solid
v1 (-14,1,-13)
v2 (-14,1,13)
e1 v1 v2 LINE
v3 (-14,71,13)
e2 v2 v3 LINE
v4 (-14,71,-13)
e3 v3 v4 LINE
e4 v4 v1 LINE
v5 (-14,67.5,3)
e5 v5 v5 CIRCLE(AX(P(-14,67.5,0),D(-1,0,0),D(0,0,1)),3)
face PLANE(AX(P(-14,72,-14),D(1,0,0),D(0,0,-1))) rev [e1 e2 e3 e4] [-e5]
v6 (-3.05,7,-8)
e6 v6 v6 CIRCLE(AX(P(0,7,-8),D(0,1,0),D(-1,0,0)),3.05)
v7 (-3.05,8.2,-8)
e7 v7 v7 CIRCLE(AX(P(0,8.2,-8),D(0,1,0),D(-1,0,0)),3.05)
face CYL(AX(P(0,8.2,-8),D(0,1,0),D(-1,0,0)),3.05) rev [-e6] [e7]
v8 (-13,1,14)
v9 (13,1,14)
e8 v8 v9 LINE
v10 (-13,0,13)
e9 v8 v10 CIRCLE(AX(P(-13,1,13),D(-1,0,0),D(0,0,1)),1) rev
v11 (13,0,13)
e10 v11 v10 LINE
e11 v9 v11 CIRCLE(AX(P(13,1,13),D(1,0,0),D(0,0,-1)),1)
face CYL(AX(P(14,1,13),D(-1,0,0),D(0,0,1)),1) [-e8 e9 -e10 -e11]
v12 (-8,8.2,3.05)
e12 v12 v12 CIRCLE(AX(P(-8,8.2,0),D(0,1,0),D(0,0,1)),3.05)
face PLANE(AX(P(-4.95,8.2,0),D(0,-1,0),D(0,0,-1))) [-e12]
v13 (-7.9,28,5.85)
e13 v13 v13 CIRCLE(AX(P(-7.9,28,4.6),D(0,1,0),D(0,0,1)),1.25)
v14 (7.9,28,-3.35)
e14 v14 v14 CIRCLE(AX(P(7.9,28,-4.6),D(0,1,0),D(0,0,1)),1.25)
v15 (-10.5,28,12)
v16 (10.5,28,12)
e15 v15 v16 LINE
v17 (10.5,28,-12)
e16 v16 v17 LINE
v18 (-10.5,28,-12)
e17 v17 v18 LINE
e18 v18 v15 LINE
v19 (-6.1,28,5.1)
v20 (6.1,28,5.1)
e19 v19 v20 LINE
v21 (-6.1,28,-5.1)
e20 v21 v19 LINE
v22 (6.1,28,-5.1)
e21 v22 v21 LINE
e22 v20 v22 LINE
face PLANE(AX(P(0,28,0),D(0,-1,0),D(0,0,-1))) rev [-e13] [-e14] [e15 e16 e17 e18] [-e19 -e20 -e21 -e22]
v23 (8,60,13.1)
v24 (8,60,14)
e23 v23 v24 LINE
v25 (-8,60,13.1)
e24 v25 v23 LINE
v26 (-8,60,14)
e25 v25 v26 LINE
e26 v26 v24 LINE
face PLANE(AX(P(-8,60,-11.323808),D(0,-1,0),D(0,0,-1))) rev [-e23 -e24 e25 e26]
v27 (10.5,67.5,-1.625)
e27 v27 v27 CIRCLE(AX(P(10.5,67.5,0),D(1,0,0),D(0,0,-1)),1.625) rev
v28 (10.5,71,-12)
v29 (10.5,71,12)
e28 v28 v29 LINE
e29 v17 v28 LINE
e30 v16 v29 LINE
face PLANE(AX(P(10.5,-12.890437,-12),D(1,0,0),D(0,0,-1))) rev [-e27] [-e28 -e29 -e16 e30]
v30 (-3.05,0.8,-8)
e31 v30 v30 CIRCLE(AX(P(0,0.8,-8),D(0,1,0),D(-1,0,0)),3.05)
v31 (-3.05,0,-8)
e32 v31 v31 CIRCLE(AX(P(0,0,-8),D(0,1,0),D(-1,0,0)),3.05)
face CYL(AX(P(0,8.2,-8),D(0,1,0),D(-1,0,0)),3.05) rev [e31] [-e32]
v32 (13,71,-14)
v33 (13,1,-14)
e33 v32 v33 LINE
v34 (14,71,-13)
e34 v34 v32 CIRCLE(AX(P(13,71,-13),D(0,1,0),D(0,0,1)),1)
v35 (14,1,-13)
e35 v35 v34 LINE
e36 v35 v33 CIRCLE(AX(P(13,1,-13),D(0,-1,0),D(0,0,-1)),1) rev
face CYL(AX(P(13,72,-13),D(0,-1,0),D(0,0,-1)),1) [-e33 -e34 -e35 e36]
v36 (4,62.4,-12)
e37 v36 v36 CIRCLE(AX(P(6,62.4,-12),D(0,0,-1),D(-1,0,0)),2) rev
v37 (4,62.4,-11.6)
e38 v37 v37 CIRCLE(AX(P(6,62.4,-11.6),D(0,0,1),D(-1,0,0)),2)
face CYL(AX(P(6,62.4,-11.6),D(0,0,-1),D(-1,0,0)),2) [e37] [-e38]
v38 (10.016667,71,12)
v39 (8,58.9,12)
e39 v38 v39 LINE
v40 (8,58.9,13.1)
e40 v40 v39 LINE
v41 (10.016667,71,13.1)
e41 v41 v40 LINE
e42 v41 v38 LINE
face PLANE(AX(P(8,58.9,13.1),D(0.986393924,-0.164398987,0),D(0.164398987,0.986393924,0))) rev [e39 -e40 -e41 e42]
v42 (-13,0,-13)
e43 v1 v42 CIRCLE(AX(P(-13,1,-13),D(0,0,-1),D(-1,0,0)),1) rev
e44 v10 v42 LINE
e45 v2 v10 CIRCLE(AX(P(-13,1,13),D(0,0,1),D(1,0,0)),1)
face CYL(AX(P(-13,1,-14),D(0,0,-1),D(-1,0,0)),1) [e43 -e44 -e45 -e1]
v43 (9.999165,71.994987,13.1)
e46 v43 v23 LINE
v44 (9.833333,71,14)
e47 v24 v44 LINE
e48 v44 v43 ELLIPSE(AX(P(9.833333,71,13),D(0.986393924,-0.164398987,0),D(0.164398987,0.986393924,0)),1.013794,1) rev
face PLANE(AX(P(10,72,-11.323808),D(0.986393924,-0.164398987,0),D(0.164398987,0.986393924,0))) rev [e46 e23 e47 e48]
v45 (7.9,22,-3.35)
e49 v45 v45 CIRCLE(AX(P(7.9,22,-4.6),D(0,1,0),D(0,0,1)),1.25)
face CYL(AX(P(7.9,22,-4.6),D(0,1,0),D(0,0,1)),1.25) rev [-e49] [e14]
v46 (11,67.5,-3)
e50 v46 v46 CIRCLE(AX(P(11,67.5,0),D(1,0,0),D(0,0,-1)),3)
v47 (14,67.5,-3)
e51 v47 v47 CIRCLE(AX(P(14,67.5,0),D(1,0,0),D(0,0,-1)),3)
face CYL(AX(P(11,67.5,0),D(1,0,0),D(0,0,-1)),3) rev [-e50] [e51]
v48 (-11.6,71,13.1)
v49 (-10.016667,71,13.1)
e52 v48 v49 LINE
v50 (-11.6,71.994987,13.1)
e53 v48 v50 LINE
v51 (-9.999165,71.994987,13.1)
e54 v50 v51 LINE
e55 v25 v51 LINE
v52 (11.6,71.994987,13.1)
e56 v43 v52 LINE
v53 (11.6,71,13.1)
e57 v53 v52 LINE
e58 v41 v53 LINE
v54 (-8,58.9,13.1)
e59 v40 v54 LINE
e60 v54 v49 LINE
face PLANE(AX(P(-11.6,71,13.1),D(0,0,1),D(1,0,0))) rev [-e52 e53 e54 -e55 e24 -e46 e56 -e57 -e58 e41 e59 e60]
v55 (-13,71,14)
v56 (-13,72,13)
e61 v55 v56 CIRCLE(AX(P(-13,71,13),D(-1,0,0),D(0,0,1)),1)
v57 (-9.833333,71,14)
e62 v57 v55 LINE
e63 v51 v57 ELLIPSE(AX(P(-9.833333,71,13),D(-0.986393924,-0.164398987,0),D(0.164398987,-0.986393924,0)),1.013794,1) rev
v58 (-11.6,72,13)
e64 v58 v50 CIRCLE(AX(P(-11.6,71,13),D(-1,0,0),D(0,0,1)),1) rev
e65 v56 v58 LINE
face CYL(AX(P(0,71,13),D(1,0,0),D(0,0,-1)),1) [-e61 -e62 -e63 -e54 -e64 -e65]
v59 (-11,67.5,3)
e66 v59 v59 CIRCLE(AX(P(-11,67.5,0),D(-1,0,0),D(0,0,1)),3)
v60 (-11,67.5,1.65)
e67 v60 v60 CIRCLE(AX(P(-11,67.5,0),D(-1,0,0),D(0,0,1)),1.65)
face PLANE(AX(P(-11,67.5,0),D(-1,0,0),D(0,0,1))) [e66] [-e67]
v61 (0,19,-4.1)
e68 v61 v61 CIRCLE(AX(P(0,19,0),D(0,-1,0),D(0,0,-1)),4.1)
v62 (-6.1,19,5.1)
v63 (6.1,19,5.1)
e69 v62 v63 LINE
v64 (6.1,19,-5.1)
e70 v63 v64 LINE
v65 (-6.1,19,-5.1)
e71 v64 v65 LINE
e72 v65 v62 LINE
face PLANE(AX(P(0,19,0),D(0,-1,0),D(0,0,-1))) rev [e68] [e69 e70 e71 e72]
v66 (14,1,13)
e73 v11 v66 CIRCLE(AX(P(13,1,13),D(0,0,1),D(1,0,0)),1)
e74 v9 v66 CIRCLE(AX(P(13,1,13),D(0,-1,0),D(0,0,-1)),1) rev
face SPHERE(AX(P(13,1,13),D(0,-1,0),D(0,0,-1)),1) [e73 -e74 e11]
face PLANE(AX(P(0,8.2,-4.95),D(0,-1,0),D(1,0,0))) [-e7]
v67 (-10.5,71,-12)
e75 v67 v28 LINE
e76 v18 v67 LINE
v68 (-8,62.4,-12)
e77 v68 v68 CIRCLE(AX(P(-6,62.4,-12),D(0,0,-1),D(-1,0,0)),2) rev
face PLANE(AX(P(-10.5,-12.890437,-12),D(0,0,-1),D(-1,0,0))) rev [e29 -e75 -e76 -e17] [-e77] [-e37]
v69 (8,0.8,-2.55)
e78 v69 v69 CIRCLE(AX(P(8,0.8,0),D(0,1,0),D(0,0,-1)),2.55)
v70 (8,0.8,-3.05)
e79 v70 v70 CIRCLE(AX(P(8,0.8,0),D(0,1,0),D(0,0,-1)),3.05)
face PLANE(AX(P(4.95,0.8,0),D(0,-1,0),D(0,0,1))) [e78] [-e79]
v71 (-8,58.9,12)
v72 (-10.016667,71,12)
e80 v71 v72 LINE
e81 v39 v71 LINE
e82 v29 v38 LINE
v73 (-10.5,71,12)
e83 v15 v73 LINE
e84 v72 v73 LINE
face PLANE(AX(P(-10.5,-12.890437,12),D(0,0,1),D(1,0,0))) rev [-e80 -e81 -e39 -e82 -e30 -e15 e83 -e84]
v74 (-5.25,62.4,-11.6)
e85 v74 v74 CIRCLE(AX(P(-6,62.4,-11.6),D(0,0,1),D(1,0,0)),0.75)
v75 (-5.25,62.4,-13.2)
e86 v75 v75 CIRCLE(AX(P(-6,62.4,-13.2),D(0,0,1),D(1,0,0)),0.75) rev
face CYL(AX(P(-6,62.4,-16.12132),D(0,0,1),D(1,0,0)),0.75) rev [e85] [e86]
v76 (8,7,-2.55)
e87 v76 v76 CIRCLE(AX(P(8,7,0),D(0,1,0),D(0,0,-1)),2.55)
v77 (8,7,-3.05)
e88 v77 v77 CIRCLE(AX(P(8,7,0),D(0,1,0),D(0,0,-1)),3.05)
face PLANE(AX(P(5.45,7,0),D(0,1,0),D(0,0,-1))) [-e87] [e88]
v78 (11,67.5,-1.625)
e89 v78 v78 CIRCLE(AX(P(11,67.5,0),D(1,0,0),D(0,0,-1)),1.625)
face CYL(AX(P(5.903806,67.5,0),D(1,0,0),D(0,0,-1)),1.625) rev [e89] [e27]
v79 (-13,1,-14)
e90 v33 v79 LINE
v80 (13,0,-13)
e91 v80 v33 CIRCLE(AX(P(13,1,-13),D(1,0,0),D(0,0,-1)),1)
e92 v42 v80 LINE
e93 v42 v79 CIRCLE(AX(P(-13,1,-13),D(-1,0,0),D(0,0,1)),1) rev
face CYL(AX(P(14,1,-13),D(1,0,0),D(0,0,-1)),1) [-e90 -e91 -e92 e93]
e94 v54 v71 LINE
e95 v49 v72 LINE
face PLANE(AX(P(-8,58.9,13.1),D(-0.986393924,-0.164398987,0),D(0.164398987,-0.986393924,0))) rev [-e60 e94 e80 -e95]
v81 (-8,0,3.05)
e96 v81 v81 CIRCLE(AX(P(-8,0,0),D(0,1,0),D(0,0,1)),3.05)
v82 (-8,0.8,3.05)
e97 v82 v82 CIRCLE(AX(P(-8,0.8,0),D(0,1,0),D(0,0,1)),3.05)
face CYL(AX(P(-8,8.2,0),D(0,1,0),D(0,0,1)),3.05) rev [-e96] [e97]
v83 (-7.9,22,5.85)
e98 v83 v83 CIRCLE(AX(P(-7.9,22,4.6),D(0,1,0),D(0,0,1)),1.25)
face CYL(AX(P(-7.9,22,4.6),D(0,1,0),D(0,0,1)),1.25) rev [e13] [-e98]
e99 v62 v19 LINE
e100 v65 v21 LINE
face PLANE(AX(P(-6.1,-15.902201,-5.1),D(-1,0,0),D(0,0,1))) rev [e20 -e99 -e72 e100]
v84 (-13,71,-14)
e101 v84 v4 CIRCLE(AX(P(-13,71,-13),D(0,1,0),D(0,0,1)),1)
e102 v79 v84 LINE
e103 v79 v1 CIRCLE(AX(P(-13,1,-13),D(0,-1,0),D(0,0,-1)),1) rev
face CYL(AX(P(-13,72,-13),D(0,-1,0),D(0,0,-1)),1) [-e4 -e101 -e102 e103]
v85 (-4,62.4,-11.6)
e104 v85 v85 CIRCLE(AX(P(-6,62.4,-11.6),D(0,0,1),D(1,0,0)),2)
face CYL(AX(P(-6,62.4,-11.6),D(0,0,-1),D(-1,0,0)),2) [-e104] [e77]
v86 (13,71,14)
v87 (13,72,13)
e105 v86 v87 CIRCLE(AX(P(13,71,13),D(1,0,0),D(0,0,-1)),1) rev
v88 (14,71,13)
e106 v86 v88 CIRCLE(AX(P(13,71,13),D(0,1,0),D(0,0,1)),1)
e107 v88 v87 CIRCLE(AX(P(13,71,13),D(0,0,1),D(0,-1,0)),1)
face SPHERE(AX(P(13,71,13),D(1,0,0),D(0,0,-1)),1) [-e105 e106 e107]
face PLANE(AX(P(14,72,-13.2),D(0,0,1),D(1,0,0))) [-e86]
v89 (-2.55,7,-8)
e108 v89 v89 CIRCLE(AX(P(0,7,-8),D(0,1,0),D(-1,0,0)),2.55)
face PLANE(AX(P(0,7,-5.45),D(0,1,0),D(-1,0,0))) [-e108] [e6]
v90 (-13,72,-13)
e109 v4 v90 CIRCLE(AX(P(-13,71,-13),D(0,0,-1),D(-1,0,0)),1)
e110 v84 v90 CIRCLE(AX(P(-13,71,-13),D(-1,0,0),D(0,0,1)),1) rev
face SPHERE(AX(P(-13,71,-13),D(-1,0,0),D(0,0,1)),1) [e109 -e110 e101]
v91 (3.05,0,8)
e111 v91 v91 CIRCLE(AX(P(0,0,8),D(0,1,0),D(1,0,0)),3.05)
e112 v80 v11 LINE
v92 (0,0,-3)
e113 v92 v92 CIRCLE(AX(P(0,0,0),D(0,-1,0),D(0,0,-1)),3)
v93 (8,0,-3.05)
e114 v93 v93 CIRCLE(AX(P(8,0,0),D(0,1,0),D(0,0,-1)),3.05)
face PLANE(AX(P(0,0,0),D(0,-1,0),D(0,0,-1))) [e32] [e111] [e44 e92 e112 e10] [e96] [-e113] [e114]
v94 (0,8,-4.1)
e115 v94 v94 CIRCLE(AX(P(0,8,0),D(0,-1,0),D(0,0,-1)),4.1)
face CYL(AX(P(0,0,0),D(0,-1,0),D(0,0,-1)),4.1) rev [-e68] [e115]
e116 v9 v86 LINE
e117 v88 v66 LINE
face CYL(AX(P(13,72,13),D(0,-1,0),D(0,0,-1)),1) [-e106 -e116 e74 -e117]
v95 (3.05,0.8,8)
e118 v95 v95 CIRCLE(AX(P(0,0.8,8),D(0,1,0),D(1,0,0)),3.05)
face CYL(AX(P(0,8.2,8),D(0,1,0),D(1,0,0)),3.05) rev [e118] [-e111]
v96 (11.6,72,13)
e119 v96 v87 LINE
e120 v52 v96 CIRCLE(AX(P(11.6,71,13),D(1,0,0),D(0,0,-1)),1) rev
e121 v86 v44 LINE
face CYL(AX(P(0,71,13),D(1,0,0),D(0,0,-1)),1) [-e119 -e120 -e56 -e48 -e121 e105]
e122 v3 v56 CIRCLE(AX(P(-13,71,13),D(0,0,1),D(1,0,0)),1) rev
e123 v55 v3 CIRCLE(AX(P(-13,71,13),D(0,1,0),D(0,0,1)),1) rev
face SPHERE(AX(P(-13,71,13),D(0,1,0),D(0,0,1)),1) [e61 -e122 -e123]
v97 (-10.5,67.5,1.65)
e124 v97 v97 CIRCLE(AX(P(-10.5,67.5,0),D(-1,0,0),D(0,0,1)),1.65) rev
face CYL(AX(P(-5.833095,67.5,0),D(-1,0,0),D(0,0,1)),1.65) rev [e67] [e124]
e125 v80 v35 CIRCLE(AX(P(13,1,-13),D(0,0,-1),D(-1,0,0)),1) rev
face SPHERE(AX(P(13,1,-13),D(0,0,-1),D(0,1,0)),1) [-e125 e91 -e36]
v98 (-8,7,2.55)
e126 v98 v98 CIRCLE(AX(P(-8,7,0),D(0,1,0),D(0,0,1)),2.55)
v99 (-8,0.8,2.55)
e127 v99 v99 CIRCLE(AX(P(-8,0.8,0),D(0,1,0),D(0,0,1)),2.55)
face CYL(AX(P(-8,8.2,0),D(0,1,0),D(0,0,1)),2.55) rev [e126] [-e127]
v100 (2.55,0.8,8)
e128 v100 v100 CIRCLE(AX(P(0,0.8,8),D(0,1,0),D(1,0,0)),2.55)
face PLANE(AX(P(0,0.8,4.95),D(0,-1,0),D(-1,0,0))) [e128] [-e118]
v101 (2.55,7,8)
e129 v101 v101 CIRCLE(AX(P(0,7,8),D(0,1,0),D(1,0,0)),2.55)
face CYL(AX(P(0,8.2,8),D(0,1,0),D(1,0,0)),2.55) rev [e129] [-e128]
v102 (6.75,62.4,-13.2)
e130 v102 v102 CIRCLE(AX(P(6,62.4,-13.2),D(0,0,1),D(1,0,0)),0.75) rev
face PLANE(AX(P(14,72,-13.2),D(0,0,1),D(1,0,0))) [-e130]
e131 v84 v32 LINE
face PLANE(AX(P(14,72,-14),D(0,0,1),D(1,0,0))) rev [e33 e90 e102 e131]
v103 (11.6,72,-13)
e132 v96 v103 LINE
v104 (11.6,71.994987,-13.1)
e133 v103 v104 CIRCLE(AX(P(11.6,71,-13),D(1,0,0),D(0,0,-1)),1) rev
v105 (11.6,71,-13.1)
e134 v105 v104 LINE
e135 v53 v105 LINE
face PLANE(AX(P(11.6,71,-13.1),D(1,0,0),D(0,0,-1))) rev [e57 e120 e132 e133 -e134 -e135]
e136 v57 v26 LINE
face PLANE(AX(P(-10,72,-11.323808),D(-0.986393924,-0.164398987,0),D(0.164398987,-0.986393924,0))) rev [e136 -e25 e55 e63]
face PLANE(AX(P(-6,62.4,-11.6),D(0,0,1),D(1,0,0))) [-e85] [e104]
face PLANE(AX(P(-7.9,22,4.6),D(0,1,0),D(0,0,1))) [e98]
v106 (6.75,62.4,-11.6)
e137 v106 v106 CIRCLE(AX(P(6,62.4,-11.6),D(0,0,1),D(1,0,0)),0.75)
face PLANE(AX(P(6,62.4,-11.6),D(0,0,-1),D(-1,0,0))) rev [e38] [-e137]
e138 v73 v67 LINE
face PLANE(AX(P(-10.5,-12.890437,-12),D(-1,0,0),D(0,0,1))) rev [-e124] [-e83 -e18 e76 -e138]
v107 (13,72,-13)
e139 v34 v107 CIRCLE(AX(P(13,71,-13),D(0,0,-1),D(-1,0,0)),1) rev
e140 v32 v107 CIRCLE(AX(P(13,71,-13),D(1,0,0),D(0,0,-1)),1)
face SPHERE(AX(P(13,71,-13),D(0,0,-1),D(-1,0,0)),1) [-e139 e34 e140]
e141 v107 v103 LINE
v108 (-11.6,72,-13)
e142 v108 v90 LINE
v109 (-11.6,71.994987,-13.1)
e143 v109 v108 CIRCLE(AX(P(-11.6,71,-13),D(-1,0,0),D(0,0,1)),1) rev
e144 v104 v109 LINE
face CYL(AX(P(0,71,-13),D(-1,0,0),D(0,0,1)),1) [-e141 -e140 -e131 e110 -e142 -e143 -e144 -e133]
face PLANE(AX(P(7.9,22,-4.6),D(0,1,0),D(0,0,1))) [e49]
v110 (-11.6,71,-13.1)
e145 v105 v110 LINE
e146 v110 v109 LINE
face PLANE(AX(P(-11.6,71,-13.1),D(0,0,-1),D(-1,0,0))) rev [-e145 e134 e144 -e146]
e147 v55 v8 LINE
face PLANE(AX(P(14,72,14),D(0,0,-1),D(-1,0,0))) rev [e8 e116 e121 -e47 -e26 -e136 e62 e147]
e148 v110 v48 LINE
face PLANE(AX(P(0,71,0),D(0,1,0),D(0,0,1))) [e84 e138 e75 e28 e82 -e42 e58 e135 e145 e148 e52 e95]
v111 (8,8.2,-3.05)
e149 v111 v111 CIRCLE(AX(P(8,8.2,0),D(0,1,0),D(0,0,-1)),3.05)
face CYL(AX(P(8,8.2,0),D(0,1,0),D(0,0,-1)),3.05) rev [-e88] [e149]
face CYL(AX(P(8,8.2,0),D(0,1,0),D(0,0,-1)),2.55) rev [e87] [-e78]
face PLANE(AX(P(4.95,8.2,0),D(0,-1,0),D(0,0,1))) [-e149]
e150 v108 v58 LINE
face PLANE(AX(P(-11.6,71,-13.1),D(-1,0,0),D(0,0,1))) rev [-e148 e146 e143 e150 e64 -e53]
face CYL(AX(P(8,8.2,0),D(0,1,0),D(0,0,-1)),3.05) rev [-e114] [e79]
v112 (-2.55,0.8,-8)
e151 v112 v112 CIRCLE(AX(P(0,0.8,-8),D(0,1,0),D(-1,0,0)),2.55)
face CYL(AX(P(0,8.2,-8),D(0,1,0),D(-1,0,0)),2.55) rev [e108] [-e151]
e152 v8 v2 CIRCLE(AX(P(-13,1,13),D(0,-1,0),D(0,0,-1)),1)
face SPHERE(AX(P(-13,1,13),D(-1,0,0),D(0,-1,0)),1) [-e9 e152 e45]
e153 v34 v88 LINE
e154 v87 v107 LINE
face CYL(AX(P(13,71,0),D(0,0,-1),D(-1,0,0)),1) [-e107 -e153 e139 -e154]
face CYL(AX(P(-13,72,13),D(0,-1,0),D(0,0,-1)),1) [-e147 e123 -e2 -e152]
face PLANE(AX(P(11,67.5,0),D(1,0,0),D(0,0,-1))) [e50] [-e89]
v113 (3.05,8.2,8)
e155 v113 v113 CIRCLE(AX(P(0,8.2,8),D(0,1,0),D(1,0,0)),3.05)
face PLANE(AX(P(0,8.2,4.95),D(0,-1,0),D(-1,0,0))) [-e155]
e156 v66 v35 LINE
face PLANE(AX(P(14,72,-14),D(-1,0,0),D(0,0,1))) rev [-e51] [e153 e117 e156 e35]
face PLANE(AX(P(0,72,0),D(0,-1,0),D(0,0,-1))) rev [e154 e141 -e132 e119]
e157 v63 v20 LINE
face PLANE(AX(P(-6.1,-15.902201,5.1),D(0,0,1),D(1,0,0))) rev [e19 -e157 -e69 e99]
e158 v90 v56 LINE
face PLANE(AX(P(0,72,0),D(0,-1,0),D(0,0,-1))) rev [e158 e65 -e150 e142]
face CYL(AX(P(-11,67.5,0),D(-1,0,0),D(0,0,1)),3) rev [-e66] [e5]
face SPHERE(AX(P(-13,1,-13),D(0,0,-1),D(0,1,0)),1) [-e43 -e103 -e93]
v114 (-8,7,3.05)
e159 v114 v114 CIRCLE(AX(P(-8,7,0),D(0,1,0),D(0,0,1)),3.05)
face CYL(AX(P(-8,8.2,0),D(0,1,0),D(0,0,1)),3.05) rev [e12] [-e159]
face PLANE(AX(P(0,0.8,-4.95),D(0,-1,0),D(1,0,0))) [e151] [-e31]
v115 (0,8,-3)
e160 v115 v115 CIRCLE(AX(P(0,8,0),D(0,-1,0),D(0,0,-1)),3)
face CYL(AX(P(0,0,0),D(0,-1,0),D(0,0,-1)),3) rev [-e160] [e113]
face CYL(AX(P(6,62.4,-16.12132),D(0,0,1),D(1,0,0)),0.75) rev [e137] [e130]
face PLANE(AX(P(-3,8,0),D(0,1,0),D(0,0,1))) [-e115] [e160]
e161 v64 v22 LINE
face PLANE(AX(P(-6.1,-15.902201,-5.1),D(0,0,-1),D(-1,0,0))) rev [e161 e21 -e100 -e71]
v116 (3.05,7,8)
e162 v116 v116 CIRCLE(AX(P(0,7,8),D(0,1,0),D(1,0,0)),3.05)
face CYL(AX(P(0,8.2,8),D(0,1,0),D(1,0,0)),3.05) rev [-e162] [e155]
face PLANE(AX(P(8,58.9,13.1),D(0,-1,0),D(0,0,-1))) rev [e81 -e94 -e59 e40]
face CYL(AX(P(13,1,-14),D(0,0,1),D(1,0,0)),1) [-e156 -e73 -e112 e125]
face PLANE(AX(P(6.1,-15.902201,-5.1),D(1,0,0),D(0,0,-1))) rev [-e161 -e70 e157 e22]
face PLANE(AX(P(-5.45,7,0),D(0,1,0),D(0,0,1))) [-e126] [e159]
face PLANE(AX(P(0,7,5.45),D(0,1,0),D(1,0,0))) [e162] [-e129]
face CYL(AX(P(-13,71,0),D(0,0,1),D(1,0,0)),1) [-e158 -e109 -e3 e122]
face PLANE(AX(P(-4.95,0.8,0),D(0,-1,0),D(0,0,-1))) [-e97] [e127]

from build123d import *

# Parameters (mm, degrees)
SKIZZE1_W                        = 28
SKIZZE1_H                        = 28
AUFSATZ_LINEAR_AUSTRAGEN1_DEPTH  = 72
SKIZZE2_W                        = 12.2
SKIZZE2_H                        = 10.2
SCHNITT_LINEAR_AUSTRAGEN1_DEPTH  = 53
SKIZZE3_W                        = 21
SKIZZE3_H                        = 24
SCHNITT_LINEAR_AUSTRAGEN2_DEPTH  = 44
SKIZZE6_R                        = 1.25
SCHNITT_LINEAR_AUSTRAGEN4_DEPTH  = 6
SCHNITT_LINEAR_AUSTRAGEN13_DEPTH = 2
SKIZZE7_W                        = 23.2
SKIZZE7_H                        = 26.2
SCHNITT_LINEAR_AUSTRAGEN5_DEPTH  = 1
SCHNITT_LINEAR_AUSTRAGEN14_DEPTH = 1.1
SKIZZE13_R                       = 3
SCHNITT_LINEAR_AUSTRAGEN11_DEPTH = 3
SCHNITT_LINEAR_START             = -3
SKIZZE11_R                       = 3
SCHNITT_LINEAR_AUSTRAGEN9_DEPTH  = 3
SKIZZE12_R                       = 1.625
SCHNITT_LINEAR_AUSTRAGEN10_DEPTH = 0.5
SKIZZE14_R                       = 1.65
SCHNITT_LINEAR_AUSTRAGEN12_DEPTH = 0.5
SKIZZE18_R                       = 2
AUFSATZ_LINEAR_AUSTRAGEN2_DEPTH  = 0.4
SKIZZE19_R                       = 0.75
SCHNITT_LINEAR_AUSTRAGEN15_DEPTH = 1.6
KREISMUSTER1_COUNT               = 4
VERRUNDUNG1_R                    = 1


with BuildPart() as part:
    # Skizze1 → Aufsatz-Linear austragen1 (new body)
    with BuildSketch(Plane(origin=(0, 0, 0), x_dir=(1, 0, 0), z_dir=(0, 1, 0))):
        Rectangle(SKIZZE1_W, SKIZZE1_H)
    extrude(amount=AUFSATZ_LINEAR_AUSTRAGEN1_DEPTH)

    # Skizze2 → Schnitt-Linear austragen1 (cut)
    with BuildSketch(Plane(origin=(0, 72, 0), x_dir=(1, 0, 0), z_dir=(0, 1, 0))):
        Rectangle(SKIZZE2_W, SKIZZE2_H)
    extrude(amount=-SCHNITT_LINEAR_AUSTRAGEN1_DEPTH, mode=Mode.SUBTRACT)

    # Skizze3 → Schnitt-Linear austragen2 (cut)
    with BuildSketch(Plane(origin=(0, 72, 0), x_dir=(1, 0, 0), z_dir=(0, 1, 0))):
        Rectangle(SKIZZE3_W, SKIZZE3_H)
    extrude(amount=-SCHNITT_LINEAR_AUSTRAGEN2_DEPTH, mode=Mode.SUBTRACT)

    # Skizze5 → Schnitt-Rotation1 (revolve, cut)
    with BuildSketch(Plane.XY, mode=Mode.PRIVATE) as schnitt_rotation1_sk:
        Polygon((-3, 0), (-3, 8), (-4.1, 8), (-4.1, 19), (0, 19), (0, 0), align=None)
    revolve(schnitt_rotation1_sk.sketch.rotate(Axis((0, 0, 0), (0, 1, 0)), 270), axis=Axis((0, 0, 0), (0, 1, 0)), mode=Mode.SUBTRACT)

    # Skizze6 → Schnitt-Linear austragen4 (cut)
    with BuildSketch(Plane(origin=(0, 28, 0), x_dir=(1, 0, 0), z_dir=(0, 1, 0))):
        with Locations(Location((7.9, 4.6, 0), (0, 0, 270))):
            Circle(SKIZZE6_R)
        with Locations(Location((-7.9, -4.6, 0), (0, 0, 270))):
            Circle(SKIZZE6_R)
    extrude(amount=-SCHNITT_LINEAR_AUSTRAGEN4_DEPTH, mode=Mode.SUBTRACT)

    # Skizze15 → Schnitt-Linear austragen13 (cut)
    with BuildSketch(Plane.XY.offset(14)):
        Polygon((10, 72), (-10, 72), (-8, 60), (8, 60), align=None)
    extrude(amount=-SCHNITT_LINEAR_AUSTRAGEN13_DEPTH, mode=Mode.SUBTRACT)

    # Skizze7 → Schnitt-Linear austragen5 (cut)
    with BuildSketch(Plane(origin=(0, 72, 0), x_dir=(1, 0, 0), z_dir=(0, 1, 0))):
        Rectangle(SKIZZE7_W, SKIZZE7_H)
    extrude(amount=-SCHNITT_LINEAR_AUSTRAGEN5_DEPTH, mode=Mode.SUBTRACT)

    # Skizze17 → Schnitt-Linear austragen14 (cut)
    with BuildSketch(Plane(origin=(0, 0, 12), x_dir=(-1, 0, 0), z_dir=(0, 0, -1))):
        Polygon((-8, 58.9), (-10.016666667, 71), (-9.833333333, 71), (-8, 60), (8, 60), (9.833333333, 71), (10.016666667, 71), (8, 58.9), align=None)
    extrude(amount=-SCHNITT_LINEAR_AUSTRAGEN14_DEPTH, mode=Mode.SUBTRACT)

    # Skizze13 → Schnitt-Linear austragen11 (cut)
    with BuildSketch(Plane.ZY.offset(14)):
        with Locations((0, 67.5)):
            Circle(SKIZZE13_R)
    extrude(amount=-SCHNITT_LINEAR_AUSTRAGEN11_DEPTH, mode=Mode.SUBTRACT)

    # Skizze11 → Schnitt-Linear austragen9 (cut)
    with BuildSketch(Plane(origin=(14, 0, 0), x_dir=(0, 0, -1), z_dir=(1, 0, 0)).offset(SCHNITT_LINEAR_START)):
        with Locations(Location((0, 67.5, 0), (0, 0, 180))):
            Circle(SKIZZE11_R)
    extrude(amount=SCHNITT_LINEAR_AUSTRAGEN9_DEPTH, mode=Mode.SUBTRACT)

    # Skizze12 → Schnitt-Linear austragen10 (cut)
    with BuildSketch(Plane(origin=(11, 0, 0), x_dir=(0, 0, -1), z_dir=(1, 0, 0))):
        with Locations((0, 67.5)):
            Circle(SKIZZE12_R)
    extrude(amount=-SCHNITT_LINEAR_AUSTRAGEN10_DEPTH, mode=Mode.SUBTRACT)

    # Skizze14 → Schnitt-Linear austragen12 (cut)
    with BuildSketch(Plane.ZY.offset(11)):
        with Locations((0, 67.5)):
            Circle(SKIZZE14_R)
    extrude(amount=-SCHNITT_LINEAR_AUSTRAGEN12_DEPTH, mode=Mode.SUBTRACT)

    # Skizze18 → Aufsatz-Linear austragen2 (add)
    with BuildSketch(Plane.XY.offset(-12)):
        with Locations(Location((-6, 62.4, 0), (0, 0, 180))):
            Circle(SKIZZE18_R)
        with Locations(Location((6, 62.4, 0), (0, 0, 180))):
            Circle(SKIZZE18_R)
    extrude(amount=AUFSATZ_LINEAR_AUSTRAGEN2_DEPTH)

    # Skizze19 → Schnitt-Linear austragen15 (cut)
    with BuildSketch(Plane.XY.offset(-11.6)):
        with Locations((-6, 62.4)):
            Circle(SKIZZE19_R)
        with Locations((6, 62.4)):
            Circle(SKIZZE19_R)
    extrude(amount=-SCHNITT_LINEAR_AUSTRAGEN15_DEPTH, mode=Mode.SUBTRACT)

    # Skizze20 → Schnitt-Rotation2 (revolve, cut)
    with BuildSketch(Plane.XY, mode=Mode.PRIVATE) as schnitt_rotation2_sk:
        Polygon((-4.95, 0), (-4.95, 0.8), (-5.45, 0.8), (-5.45, 7), (-4.95, 7), (-4.95, 8.2), (-8, 8.2), (-8, 0), align=None)
    schnitt_rotation2 = revolve(schnitt_rotation2_sk.sketch.rotate(Axis((-8, 8.2, 0), (0, -1, 0)), 90), axis=Axis((-8, 8.2, 0), (0, -1, 0)), mode=Mode.SUBTRACT)

    # Kreismuster1: Schnitt-Rotation2 ×4 about axis
    kreismuster1_axis = Axis((0, 0, 0), (0, 1, 0))
    for i in range(1, KREISMUSTER1_COUNT):
        add(schnitt_rotation2.rotate(kreismuster1_axis, i * 360 / KREISMUSTER1_COUNT), mode=Mode.SUBTRACT)

    # Verrundung1
    # the kernel refuses this fillet: 1 mm, written as the material it takes off along each edge
    with BuildSketch(Plane(origin=(-13, 1, -13), x_dir=(-1, 0, 0), z_dir=(0, 0, -1))) as verrundung1_piece_1_section:
        Polygon((0, 0), (VERRUNDUNG1_R, 0), (VERRUNDUNG1_R, -VERRUNDUNG1_R), (0, -VERRUNDUNG1_R), align=None)
    verrundung1_piece_1 = extrude(amount=VERRUNDUNG1_R, mode=Mode.PRIVATE)
    verrundung1_piece_1 = verrundung1_piece_1 - Plane(origin=(-13, 1, -13), x_dir=(0.7071067811865475, 0.7071067811865475, 0), z_dir=(0, 0, -1)) * Sphere(VERRUNDUNG1_R, mode=Mode.PRIVATE)
    add(verrundung1_piece_1, mode=Mode.SUBTRACT)
    with BuildSketch(Plane(origin=(-13, 1, 13), x_dir=(0, -1, 0), z_dir=(-1, 0, 0))) as verrundung1_piece_2_section:
        Polygon((0, 0), (VERRUNDUNG1_R, 0), (VERRUNDUNG1_R, VERRUNDUNG1_R), (0, VERRUNDUNG1_R), align=None)
    verrundung1_piece_2 = extrude(amount=VERRUNDUNG1_R, mode=Mode.PRIVATE)
    verrundung1_piece_2 = verrundung1_piece_2 - Plane(origin=(-13, 1, 13), x_dir=(0, 0.7071067811865475, -0.7071067811865475), z_dir=(-1, 0, 0)) * Sphere(VERRUNDUNG1_R, mode=Mode.PRIVATE)
    add(verrundung1_piece_2, mode=Mode.SUBTRACT)
    with BuildSketch(Plane(origin=(13, 1, 13), x_dir=(0, -1, 0), z_dir=(1, 0, 0))) as verrundung1_piece_3_section:
        Polygon((0, 0), (VERRUNDUNG1_R, 0), (VERRUNDUNG1_R, -VERRUNDUNG1_R), (0, -VERRUNDUNG1_R), align=None)
    verrundung1_piece_3 = extrude(amount=VERRUNDUNG1_R, mode=Mode.PRIVATE)
    verrundung1_piece_3 = verrundung1_piece_3 - Plane(origin=(13, 1, 13), x_dir=(0, 0.7071067811865475, -0.7071067811865475), z_dir=(1, 0, 0)) * Sphere(VERRUNDUNG1_R, mode=Mode.PRIVATE)
    add(verrundung1_piece_3, mode=Mode.SUBTRACT)
    with BuildSketch(Plane(origin=(13, 1, -13), x_dir=(1, 0, 0), z_dir=(0, 0, -1))) as verrundung1_piece_4_section:
        Polygon((0, 0), (VERRUNDUNG1_R, 0), (VERRUNDUNG1_R, VERRUNDUNG1_R), (0, VERRUNDUNG1_R), align=None)
    verrundung1_piece_4 = extrude(amount=VERRUNDUNG1_R, mode=Mode.PRIVATE)
    verrundung1_piece_4 = verrundung1_piece_4 - Plane(origin=(13, 1, -13), x_dir=(-0.7071067811865475, 0.7071067811865475, 0), z_dir=(0, 0, -1)) * Sphere(VERRUNDUNG1_R, mode=Mode.PRIVATE)
    add(verrundung1_piece_4, mode=Mode.SUBTRACT)
    with BuildSketch(Plane(origin=(13, 71, 13), x_dir=(0, 1, 0), z_dir=(1, 0, 0))) as verrundung1_piece_5_section:
        Polygon((0, 0), (VERRUNDUNG1_R, 0), (VERRUNDUNG1_R, VERRUNDUNG1_R), (0, VERRUNDUNG1_R), align=None)
    verrundung1_piece_5 = extrude(amount=VERRUNDUNG1_R, mode=Mode.PRIVATE)
    verrundung1_piece_5 = verrundung1_piece_5 - Plane(origin=(13, 71, 13), x_dir=(0, -0.7071067811865475, -0.7071067811865475), z_dir=(1, 0, 0)) * Sphere(VERRUNDUNG1_R, mode=Mode.PRIVATE)
    add(verrundung1_piece_5, mode=Mode.SUBTRACT)
    with BuildSketch(Plane(origin=(13, 71, -13), x_dir=(1, 0, 0), z_dir=(0, 0, -1))) as verrundung1_piece_6_section:
        Polygon((0, 0), (VERRUNDUNG1_R, 0), (VERRUNDUNG1_R, -VERRUNDUNG1_R), (0, -VERRUNDUNG1_R), align=None)
    verrundung1_piece_6 = extrude(amount=VERRUNDUNG1_R, mode=Mode.PRIVATE)
    verrundung1_piece_6 = verrundung1_piece_6 - Plane(origin=(13, 71, -13), x_dir=(-0.7071067811865475, -0.7071067811865475, 0), z_dir=(0, 0, -1)) * Sphere(VERRUNDUNG1_R, mode=Mode.PRIVATE)
    add(verrundung1_piece_6, mode=Mode.SUBTRACT)
    with BuildSketch(Plane(origin=(-13, 71, -13), x_dir=(-1, 0, 0), z_dir=(0, 0, -1))) as verrundung1_piece_7_section:
        Polygon((0, 0), (VERRUNDUNG1_R, 0), (VERRUNDUNG1_R, VERRUNDUNG1_R), (0, VERRUNDUNG1_R), align=None)
    verrundung1_piece_7 = extrude(amount=VERRUNDUNG1_R, mode=Mode.PRIVATE)
    verrundung1_piece_7 = verrundung1_piece_7 - Plane(origin=(-13, 71, -13), x_dir=(0.7071067811865475, -0.7071067811865475, 0), z_dir=(0, 0, -1)) * Sphere(VERRUNDUNG1_R, mode=Mode.PRIVATE)
    add(verrundung1_piece_7, mode=Mode.SUBTRACT)
    with BuildSketch(Plane(origin=(-13, 71, 13), x_dir=(0, 1, 0), z_dir=(-1, 0, 0))) as verrundung1_piece_8_section:
        Polygon((0, 0), (VERRUNDUNG1_R, 0), (VERRUNDUNG1_R, -VERRUNDUNG1_R), (0, -VERRUNDUNG1_R), align=None)
    verrundung1_piece_8 = extrude(amount=VERRUNDUNG1_R, mode=Mode.PRIVATE)
    verrundung1_piece_8 = verrundung1_piece_8 - Plane(origin=(-13, 71, 13), x_dir=(0, -0.7071067811865475, -0.7071067811865475), z_dir=(-1, 0, 0)) * Sphere(VERRUNDUNG1_R, mode=Mode.PRIVATE)
    add(verrundung1_piece_8, mode=Mode.SUBTRACT)
    with BuildSketch(Plane(origin=(-14, 0, -13), x_dir=(0, 1, 0), z_dir=(0, 0, 1)), Plane(origin=(14, 0, 13), x_dir=(0, 1, 0), z_dir=(0, 0, -1)), Plane(origin=(13, 0, -14), x_dir=(0, 1, 0), z_dir=(-1, 0, 0))) as verrundung1_piece_9:
        with BuildLine():
            CenterArc((VERRUNDUNG1_R, -VERRUNDUNG1_R), VERRUNDUNG1_R, 90, 90)
            Line((0, -VERRUNDUNG1_R), (0, 0))
            Line((0, 0), (VERRUNDUNG1_R, 0))
        make_face()
    extrude(amount=26, mode=Mode.SUBTRACT)
    with BuildSketch(Plane(origin=(-13, 0, 14), x_dir=(0, 0, -1), z_dir=(1, 0, 0)), Plane(origin=(13, 72, -14), x_dir=(0, -1, 0), z_dir=(-1, 0, 0)), Plane(origin=(14, 72, 13), x_dir=(0, -1, 0), z_dir=(0, 0, -1)), Plane(origin=(-14, 72, -13), x_dir=(0, -1, 0), z_dir=(0, 0, 1))) as verrundung1_piece_10:
        with BuildLine():
            CenterArc((VERRUNDUNG1_R, VERRUNDUNG1_R), VERRUNDUNG1_R, 180, 90)
            Line((0, VERRUNDUNG1_R), (0, 0))
            Line((0, 0), (VERRUNDUNG1_R, 0))
        make_face()
    extrude(amount=26, mode=Mode.SUBTRACT)
    with BuildSketch(Plane(origin=(14, 1, 14), x_dir=(0, 0, -1), z_dir=(0, 1, 0)), Plane(origin=(14, 1, -14), x_dir=(-1, 0, 0), z_dir=(0, 1, 0))) as verrundung1_piece_11:
        with BuildLine():
            CenterArc((VERRUNDUNG1_R, VERRUNDUNG1_R), VERRUNDUNG1_R, 180, 90)
            Line((0, VERRUNDUNG1_R), (0, 0))
            Line((0, 0), (VERRUNDUNG1_R, 0))
        make_face()
    extrude(amount=70, mode=Mode.SUBTRACT)
    with BuildSketch(Plane(origin=(-14, 1, -14), x_dir=(1, 0, 0), z_dir=(0, 1, 0)), Plane(origin=(-14, 1, 14), x_dir=(0, 0, -1), z_dir=(0, 1, 0))) as verrundung1_piece_12:
        with BuildLine():
            CenterArc((VERRUNDUNG1_R, -VERRUNDUNG1_R), VERRUNDUNG1_R, 90, 90)
            Line((0, -VERRUNDUNG1_R), (0, 0))
            Line((0, 0), (VERRUNDUNG1_R, 0))
        make_face()
    extrude(amount=70, mode=Mode.SUBTRACT)
    with BuildSketch(Plane(origin=(7.5, 72, 14), x_dir=(0, 0, -1), z_dir=(1, 0, 0)), Plane(origin=(-13, 72, 14), x_dir=(0, 0, -1), z_dir=(1, 0, 0))) as verrundung1_piece_13:
        with BuildLine():
            CenterArc((VERRUNDUNG1_R, -VERRUNDUNG1_R), VERRUNDUNG1_R, 90, 90)
            Line((0, -VERRUNDUNG1_R), (0, 0))
            Line((0, 0), (VERRUNDUNG1_R, 0))
        make_face()
    extrude(amount=5.5, mode=Mode.SUBTRACT)


solid = part.part
